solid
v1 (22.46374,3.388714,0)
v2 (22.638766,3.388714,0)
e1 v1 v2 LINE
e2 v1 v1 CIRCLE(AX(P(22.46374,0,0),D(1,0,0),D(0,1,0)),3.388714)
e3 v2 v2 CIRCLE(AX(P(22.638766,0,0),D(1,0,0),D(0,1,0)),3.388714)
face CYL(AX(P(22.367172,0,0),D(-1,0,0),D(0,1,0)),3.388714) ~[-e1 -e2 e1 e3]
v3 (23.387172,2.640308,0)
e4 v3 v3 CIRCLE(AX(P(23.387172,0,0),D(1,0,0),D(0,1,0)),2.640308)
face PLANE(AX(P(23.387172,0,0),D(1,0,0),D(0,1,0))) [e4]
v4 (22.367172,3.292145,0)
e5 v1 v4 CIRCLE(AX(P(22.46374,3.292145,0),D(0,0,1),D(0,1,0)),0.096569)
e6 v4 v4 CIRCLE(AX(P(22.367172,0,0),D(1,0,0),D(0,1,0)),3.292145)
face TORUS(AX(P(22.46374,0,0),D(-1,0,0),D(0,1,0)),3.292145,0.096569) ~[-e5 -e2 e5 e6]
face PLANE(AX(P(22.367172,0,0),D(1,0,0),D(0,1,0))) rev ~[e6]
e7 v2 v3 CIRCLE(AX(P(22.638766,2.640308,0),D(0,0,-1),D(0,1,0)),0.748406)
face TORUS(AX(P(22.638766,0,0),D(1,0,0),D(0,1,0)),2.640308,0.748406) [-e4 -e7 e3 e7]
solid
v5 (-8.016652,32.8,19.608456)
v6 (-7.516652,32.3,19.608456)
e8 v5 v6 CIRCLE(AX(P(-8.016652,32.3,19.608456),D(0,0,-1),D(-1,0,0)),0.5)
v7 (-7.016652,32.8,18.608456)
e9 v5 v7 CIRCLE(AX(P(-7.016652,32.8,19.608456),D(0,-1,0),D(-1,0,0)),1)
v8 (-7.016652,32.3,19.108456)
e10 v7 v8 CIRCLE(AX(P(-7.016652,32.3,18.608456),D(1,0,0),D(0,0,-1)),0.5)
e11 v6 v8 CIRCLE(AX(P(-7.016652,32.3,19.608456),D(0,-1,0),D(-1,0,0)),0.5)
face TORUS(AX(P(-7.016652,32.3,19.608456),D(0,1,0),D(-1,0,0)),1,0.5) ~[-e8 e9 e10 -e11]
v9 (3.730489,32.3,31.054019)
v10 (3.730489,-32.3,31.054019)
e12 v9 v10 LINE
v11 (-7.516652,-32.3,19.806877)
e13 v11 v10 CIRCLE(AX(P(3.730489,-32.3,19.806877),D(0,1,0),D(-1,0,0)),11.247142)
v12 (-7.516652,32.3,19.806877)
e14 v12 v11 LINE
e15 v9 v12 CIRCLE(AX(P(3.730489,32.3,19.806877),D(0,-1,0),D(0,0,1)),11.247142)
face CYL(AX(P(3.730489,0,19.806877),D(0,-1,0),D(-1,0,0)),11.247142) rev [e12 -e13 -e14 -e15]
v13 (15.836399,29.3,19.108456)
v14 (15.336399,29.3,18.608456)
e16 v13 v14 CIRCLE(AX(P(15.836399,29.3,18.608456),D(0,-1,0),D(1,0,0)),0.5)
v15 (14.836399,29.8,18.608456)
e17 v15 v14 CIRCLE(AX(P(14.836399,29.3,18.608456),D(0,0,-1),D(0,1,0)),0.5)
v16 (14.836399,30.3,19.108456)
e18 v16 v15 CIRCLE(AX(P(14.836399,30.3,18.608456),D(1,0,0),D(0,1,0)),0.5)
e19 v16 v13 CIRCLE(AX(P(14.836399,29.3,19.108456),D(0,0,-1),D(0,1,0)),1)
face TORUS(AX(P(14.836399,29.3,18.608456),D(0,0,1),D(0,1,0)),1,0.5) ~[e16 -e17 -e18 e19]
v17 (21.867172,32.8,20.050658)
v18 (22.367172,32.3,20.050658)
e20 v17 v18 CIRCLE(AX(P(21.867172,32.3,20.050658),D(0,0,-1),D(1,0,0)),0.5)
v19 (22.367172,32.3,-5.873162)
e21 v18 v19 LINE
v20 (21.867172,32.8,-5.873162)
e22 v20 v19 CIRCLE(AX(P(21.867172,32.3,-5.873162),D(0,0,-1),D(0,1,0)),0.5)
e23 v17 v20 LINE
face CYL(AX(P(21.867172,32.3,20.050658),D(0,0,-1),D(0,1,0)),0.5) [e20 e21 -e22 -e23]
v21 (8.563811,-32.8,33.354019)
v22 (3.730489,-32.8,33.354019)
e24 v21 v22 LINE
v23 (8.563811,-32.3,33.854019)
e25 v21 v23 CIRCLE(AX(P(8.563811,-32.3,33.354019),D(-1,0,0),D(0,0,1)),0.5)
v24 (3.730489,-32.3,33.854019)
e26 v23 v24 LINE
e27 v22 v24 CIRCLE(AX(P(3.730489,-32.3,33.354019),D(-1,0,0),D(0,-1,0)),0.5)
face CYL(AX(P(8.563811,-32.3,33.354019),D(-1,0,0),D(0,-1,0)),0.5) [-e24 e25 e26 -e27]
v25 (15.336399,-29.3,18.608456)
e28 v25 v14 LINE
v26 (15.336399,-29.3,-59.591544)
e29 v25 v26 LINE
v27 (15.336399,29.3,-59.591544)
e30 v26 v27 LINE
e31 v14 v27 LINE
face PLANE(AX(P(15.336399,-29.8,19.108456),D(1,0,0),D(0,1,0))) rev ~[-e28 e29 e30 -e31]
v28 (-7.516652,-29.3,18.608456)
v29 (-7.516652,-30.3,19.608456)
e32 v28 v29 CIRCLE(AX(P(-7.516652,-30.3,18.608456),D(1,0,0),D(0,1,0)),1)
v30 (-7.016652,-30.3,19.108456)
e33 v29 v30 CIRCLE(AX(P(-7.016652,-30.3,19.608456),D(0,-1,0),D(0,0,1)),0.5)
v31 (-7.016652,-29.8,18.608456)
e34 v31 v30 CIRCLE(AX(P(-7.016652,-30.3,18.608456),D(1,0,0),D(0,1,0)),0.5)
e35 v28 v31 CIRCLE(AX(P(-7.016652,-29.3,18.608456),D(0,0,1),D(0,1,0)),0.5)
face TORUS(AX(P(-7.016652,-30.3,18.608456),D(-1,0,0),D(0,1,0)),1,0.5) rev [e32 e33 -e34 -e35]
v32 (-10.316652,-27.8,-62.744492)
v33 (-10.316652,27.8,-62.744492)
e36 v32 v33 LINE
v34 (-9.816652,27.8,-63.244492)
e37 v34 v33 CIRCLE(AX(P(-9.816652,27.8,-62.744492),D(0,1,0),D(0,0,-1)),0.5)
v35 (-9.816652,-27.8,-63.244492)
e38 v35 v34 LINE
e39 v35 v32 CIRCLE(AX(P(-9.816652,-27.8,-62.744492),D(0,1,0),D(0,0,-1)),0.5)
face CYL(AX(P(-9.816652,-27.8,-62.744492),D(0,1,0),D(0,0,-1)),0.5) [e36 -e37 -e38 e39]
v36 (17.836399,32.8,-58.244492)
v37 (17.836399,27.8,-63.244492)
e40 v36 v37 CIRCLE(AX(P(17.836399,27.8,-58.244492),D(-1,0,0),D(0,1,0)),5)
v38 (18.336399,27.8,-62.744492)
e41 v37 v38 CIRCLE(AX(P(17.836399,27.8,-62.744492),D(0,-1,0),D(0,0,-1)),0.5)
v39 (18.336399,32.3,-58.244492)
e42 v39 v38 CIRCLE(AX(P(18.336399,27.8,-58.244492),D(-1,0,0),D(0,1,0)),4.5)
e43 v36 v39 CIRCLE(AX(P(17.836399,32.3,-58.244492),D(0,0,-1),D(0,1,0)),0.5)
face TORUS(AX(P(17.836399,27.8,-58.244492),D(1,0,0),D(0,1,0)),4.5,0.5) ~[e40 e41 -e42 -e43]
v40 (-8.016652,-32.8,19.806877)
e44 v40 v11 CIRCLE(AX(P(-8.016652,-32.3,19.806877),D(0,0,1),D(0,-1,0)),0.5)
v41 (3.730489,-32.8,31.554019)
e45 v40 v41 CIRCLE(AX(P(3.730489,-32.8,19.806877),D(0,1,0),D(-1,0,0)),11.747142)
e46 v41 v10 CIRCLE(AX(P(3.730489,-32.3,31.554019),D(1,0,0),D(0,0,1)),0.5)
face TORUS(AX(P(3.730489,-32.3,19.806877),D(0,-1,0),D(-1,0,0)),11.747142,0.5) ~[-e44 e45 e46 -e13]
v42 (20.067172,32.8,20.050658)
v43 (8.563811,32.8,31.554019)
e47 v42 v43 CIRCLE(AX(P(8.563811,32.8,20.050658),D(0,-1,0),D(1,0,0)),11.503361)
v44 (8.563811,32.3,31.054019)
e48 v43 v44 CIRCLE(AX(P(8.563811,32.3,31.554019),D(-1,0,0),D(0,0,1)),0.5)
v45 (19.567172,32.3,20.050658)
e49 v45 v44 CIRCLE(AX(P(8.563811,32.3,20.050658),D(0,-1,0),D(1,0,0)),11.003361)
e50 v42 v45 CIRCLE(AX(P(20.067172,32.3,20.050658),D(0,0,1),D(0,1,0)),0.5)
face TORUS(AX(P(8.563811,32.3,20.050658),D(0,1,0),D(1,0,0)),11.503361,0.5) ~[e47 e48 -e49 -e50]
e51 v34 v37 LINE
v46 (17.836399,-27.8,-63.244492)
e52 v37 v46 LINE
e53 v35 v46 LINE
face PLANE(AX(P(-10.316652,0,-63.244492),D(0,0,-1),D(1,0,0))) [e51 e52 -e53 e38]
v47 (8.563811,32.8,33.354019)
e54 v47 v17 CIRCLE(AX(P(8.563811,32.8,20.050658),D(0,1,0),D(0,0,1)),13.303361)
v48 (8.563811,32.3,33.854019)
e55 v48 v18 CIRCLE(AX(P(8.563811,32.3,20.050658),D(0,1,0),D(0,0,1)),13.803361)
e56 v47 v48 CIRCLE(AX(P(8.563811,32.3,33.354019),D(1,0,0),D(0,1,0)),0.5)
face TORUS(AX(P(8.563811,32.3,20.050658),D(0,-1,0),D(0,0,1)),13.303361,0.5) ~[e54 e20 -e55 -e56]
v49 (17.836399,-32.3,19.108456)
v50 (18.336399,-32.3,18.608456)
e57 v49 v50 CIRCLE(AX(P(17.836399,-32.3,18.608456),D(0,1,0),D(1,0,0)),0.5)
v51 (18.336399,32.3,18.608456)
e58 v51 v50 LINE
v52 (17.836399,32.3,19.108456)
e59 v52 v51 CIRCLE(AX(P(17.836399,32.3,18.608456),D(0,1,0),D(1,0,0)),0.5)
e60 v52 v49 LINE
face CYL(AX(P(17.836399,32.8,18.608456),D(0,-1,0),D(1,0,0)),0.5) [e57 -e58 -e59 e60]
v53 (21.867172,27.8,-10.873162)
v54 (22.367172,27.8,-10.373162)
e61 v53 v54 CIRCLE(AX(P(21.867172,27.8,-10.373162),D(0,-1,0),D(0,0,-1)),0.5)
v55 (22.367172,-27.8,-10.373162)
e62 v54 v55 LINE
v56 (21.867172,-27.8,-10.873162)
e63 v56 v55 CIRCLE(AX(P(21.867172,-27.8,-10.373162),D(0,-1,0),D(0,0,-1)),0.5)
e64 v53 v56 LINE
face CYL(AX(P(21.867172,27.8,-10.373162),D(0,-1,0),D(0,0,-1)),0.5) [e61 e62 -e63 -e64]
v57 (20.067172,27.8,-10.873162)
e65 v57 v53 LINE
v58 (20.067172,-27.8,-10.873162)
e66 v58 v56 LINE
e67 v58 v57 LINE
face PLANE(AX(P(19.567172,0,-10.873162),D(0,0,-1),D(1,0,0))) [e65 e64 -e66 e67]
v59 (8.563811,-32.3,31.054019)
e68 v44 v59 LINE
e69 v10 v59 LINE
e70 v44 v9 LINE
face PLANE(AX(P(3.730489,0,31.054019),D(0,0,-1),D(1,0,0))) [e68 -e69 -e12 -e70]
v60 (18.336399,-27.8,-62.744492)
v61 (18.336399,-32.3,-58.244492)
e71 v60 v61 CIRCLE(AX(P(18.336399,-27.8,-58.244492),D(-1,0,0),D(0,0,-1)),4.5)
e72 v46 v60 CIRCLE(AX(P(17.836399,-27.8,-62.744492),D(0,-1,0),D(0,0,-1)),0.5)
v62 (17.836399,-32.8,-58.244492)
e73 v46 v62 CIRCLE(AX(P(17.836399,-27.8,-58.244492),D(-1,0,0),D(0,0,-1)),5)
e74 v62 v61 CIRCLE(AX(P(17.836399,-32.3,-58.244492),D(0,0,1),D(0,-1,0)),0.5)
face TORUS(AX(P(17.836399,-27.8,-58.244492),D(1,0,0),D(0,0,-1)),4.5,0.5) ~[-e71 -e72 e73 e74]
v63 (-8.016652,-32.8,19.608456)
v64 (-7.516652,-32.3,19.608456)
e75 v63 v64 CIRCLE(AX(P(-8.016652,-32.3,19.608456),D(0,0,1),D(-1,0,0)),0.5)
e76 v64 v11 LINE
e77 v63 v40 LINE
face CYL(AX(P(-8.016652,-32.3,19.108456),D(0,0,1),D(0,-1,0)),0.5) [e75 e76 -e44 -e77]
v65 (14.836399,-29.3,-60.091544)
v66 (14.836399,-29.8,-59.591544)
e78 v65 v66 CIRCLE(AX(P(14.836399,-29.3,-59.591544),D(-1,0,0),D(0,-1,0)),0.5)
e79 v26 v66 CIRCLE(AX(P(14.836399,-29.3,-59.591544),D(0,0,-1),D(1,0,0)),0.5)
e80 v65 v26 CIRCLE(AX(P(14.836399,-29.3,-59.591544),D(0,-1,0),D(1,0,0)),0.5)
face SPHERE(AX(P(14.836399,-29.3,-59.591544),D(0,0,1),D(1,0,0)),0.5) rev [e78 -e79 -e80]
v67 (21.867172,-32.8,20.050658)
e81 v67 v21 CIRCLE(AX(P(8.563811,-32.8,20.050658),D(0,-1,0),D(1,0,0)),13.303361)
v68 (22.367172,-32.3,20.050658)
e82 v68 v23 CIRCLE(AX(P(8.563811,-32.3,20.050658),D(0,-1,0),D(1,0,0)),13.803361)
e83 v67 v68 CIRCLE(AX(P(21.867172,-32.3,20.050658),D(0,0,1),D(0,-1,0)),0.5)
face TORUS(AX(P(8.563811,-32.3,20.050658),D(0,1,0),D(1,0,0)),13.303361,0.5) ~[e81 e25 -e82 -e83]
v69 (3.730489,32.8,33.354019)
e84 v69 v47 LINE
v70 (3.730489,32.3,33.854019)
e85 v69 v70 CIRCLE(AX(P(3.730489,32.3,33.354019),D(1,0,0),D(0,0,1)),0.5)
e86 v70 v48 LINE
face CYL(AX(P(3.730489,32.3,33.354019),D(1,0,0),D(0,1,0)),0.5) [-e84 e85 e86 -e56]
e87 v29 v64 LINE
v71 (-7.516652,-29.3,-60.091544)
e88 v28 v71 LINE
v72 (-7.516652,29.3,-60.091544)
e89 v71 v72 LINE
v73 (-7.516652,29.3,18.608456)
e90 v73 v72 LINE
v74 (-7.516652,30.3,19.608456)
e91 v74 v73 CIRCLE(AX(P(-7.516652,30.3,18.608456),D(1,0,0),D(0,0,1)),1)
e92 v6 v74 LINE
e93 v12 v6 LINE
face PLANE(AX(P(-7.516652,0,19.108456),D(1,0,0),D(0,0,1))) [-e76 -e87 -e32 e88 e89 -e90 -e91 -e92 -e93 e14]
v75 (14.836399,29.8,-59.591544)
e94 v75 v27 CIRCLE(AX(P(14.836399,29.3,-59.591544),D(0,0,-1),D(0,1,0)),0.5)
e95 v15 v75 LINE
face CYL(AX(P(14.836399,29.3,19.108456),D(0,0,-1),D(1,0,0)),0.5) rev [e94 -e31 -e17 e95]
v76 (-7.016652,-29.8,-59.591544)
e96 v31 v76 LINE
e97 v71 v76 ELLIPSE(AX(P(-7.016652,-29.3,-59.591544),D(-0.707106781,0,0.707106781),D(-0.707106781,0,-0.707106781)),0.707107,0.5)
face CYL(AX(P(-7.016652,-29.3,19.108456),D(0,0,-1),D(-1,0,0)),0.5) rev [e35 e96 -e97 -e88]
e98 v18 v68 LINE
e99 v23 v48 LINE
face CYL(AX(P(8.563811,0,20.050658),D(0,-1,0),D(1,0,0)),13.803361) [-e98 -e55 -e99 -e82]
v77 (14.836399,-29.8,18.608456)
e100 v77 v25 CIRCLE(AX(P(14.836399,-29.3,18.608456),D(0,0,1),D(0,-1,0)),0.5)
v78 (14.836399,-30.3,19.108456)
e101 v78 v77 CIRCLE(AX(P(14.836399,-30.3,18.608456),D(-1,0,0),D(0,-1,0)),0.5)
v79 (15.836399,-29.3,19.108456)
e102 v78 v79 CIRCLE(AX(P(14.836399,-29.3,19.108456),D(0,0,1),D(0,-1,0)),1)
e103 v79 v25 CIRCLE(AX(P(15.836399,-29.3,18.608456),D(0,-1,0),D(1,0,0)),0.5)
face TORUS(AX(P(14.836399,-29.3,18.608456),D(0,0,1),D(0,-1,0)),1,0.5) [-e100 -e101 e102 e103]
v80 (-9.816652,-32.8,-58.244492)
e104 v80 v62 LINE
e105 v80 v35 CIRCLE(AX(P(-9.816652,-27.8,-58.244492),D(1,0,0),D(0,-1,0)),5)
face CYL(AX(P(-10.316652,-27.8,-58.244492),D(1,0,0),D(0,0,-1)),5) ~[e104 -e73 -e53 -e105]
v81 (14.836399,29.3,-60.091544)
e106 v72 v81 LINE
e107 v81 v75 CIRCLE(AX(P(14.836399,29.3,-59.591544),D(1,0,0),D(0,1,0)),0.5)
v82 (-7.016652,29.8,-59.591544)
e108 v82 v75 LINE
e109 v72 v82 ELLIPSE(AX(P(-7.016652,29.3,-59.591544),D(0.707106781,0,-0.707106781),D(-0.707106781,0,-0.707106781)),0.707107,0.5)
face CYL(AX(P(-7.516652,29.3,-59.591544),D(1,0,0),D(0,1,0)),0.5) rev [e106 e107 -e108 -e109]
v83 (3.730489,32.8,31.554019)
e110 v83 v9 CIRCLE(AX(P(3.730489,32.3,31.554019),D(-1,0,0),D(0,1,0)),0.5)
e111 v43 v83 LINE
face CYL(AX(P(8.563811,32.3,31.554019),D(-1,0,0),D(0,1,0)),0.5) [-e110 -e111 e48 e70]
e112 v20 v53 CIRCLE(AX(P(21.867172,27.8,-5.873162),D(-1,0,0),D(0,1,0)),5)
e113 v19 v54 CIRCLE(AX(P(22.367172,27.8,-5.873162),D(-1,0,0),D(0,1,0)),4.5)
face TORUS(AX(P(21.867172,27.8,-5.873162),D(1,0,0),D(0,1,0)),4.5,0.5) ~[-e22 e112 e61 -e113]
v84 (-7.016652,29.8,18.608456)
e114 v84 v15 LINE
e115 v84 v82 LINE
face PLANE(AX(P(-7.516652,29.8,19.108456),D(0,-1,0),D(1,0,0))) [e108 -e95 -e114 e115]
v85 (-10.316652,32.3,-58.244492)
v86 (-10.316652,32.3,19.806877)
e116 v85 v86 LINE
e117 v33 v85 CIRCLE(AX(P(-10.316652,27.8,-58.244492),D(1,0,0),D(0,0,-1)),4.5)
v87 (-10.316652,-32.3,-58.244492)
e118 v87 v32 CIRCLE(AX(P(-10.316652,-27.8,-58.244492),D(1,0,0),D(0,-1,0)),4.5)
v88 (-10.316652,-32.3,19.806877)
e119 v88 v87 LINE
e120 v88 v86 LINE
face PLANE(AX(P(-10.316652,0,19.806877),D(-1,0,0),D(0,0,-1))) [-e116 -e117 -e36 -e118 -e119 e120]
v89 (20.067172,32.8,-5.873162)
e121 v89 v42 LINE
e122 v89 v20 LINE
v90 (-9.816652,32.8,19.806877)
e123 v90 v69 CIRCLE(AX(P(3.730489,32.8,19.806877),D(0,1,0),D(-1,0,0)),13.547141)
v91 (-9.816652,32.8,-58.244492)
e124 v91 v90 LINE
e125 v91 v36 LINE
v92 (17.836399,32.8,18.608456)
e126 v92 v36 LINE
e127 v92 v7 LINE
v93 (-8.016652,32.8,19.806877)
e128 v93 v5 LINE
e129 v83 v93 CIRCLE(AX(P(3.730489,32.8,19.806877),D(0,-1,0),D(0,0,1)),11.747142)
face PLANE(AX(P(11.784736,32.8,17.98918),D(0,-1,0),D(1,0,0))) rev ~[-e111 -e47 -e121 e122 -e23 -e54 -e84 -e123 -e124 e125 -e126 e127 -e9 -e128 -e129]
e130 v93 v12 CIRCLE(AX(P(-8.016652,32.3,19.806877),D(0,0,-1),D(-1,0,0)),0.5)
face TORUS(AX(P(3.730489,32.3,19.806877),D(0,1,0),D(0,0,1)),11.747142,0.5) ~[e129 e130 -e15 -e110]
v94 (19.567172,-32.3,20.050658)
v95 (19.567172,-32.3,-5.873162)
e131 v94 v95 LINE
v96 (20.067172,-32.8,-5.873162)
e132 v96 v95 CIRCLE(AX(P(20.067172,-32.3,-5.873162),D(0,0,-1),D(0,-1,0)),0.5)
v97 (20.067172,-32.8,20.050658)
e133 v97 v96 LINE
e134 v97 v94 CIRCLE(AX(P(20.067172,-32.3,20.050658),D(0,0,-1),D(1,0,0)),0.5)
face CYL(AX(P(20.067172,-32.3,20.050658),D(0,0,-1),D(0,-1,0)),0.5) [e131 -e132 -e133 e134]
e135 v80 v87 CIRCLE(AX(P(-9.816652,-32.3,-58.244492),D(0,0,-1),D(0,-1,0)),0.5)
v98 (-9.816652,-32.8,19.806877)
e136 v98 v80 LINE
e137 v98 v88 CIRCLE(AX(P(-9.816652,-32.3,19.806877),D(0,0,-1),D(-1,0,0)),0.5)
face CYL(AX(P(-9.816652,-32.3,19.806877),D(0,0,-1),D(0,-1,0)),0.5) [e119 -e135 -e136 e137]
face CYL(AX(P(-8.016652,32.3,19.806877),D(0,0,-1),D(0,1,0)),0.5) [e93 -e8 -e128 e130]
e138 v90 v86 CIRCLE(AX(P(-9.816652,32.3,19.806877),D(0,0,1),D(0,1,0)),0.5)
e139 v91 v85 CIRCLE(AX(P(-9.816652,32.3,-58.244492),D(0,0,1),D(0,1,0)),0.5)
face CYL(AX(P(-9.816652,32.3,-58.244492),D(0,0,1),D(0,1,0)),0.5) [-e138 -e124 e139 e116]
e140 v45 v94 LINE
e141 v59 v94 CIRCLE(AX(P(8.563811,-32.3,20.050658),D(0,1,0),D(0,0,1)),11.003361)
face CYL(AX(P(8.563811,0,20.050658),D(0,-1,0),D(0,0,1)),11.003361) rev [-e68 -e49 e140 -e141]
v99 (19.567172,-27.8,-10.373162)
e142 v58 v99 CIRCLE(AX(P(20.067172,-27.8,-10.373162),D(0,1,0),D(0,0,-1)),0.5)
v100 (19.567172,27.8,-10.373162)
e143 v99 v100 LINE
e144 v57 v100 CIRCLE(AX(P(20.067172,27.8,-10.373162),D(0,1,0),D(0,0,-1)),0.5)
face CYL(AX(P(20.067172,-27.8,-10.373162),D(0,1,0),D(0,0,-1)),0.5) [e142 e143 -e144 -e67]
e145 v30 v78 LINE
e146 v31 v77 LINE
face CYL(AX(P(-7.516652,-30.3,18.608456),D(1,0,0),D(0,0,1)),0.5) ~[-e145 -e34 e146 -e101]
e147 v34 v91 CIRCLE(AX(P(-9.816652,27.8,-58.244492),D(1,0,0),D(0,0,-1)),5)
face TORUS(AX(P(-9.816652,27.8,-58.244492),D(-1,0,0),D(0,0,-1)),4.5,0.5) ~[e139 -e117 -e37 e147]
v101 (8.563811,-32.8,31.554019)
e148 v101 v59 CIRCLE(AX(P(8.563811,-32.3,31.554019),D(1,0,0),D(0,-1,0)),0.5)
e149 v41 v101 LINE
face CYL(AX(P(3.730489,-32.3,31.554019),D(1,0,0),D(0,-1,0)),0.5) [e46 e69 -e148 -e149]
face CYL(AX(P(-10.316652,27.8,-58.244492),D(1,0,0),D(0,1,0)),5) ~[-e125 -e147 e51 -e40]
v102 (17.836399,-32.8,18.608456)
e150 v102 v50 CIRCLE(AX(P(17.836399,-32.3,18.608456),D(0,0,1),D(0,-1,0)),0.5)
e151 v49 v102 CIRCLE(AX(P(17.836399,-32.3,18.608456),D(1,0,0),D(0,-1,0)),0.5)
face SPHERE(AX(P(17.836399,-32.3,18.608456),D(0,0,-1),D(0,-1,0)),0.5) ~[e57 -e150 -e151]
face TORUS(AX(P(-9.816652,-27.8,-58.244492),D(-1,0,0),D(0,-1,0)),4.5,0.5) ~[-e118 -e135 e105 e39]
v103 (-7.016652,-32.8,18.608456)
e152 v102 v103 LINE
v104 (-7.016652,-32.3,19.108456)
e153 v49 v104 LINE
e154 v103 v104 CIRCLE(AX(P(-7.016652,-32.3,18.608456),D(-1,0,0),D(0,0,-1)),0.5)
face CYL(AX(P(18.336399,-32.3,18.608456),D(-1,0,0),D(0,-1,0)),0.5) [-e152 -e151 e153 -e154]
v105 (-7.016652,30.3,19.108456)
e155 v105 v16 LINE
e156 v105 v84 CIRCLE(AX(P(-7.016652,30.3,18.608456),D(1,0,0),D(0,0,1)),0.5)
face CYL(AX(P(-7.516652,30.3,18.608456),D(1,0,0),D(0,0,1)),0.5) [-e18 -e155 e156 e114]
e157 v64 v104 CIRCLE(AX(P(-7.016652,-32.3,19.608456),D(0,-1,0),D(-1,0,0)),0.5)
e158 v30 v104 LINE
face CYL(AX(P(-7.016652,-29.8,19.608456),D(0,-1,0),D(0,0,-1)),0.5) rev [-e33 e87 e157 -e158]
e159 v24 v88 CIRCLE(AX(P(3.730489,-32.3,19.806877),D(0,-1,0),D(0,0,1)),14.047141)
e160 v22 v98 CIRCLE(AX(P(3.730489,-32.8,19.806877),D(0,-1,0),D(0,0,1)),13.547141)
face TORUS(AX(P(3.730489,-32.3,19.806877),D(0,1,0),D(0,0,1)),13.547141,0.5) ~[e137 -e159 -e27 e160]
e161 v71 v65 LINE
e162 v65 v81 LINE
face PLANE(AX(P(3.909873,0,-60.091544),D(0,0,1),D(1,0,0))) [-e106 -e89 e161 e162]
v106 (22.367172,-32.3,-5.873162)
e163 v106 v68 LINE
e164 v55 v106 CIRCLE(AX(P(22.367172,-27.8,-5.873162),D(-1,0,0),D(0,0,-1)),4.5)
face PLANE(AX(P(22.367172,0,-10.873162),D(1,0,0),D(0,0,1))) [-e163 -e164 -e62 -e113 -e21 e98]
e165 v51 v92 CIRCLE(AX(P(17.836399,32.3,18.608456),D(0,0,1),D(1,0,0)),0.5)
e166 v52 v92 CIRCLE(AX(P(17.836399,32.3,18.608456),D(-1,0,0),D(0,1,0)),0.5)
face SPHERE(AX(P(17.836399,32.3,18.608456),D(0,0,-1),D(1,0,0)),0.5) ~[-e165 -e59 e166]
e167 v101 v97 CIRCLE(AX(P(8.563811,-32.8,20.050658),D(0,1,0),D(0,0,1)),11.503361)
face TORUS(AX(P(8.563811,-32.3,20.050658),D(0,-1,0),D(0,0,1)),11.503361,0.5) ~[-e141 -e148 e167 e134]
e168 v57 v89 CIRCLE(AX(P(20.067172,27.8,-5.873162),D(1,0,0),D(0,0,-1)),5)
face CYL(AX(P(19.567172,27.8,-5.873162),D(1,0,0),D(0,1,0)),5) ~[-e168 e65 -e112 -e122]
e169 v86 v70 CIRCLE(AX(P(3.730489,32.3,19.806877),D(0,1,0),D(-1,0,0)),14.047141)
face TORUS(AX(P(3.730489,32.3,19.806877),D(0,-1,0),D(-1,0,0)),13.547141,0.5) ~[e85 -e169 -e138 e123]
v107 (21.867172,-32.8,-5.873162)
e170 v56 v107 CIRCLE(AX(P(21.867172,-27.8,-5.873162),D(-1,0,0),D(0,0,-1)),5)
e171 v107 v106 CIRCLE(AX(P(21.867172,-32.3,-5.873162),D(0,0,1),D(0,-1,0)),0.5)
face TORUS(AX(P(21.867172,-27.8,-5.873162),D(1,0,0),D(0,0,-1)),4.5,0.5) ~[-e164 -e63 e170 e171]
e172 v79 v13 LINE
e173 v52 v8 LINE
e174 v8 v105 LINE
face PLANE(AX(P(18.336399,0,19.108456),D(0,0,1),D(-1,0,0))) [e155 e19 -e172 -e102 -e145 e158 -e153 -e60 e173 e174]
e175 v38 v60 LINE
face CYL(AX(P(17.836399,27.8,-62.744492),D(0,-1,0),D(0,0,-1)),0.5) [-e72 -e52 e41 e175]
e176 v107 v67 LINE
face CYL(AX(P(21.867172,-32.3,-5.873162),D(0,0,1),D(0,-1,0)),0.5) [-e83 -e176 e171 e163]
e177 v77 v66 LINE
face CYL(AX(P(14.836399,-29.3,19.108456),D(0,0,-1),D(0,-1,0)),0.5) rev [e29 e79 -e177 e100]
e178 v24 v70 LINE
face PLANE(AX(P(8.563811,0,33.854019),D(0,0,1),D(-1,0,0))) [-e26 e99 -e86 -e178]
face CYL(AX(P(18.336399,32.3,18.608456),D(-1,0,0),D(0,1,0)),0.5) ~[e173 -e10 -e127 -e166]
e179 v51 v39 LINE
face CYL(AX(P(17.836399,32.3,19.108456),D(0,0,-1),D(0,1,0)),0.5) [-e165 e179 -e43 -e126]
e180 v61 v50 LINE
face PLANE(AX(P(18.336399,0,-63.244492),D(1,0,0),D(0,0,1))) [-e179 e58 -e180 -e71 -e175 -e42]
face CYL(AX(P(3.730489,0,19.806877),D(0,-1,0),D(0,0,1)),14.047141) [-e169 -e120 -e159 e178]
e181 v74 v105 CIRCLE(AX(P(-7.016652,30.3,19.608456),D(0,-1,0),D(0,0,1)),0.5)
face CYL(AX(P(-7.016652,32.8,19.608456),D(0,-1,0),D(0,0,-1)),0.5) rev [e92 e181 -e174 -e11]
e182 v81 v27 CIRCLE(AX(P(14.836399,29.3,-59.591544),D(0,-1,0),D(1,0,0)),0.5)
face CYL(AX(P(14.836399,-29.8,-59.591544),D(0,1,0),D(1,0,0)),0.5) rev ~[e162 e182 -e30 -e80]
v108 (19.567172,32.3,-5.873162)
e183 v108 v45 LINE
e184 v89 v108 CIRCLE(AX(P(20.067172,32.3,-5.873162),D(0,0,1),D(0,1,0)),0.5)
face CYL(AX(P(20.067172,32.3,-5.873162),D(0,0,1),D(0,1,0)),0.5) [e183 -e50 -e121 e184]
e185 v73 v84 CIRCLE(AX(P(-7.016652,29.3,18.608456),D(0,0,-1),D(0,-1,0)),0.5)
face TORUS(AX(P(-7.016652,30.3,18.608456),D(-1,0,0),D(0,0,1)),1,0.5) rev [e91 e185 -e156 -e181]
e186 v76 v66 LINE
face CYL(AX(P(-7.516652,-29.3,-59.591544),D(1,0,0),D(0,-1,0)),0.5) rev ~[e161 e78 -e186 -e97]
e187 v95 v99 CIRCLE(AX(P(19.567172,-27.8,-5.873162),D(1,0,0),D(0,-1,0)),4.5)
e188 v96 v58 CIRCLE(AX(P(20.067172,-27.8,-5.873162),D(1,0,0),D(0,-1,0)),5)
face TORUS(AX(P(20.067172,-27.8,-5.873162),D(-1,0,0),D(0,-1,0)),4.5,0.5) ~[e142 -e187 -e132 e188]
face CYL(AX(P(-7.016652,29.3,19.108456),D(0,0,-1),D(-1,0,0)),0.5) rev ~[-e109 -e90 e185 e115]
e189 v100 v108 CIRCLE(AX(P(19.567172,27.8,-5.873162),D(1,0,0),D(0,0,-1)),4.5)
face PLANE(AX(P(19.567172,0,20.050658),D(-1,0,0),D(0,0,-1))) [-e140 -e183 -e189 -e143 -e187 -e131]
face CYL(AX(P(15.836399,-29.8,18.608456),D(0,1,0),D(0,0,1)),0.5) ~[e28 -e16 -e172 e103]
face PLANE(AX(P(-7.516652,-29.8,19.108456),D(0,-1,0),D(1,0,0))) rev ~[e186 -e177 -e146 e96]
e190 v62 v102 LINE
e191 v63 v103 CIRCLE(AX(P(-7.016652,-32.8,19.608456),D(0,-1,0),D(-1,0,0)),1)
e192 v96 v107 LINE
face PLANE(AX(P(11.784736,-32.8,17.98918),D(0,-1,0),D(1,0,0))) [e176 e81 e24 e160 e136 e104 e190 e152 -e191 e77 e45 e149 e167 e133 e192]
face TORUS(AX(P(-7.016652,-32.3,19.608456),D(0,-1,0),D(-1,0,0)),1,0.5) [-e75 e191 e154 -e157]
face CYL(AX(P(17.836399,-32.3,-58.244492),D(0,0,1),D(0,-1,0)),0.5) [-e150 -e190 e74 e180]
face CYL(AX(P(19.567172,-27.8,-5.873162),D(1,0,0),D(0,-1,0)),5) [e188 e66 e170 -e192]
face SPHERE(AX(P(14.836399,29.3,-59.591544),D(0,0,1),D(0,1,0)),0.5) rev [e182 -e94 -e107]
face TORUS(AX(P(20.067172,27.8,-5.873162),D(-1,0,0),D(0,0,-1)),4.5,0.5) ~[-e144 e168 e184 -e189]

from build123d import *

# Parameters (mm, degrees)
F1_DEPTH = 32.8
F2_W     = 22.8530508727
F2_H     = 59.6
F3_DEPTH = 79.2
F4_R     = 5
F5_R     = 0.5
F6_R     = 3.3887140156
F7_DEPTH = 1.02
F8_R     = 0.7484062043
F9_R     = 0.0965685425


with BuildPart() as f1:
    # F0 (on Front) → F1 (new body, symmetric)
    with BuildSketch(Plane.XZ):
        with BuildLine():
            Line((-10.3166522458, 19.8068774239), (-10.3166522458, 19.1084556282))
            Line((-10.3166522458, 19.1084556282), (-7.5166523457, 19.1084556282))
            Line((-7.5166523457, 19.1084556282), (-7.5166523457, 19.8068774239))
            ThreePointArc((-7.5166523457, 19.8068774239), (-4.222440848, 27.759807499), (3.7304892271, 31.0540189967))
            Line((3.7304892271, 31.0540189967), (8.563811205, 31.0540189967))
            ThreePointArc((8.563811205, 31.0540189967), (16.3443622694, 27.831209223), (19.567172043, 20.0506581586))
            Line((19.567172043, 20.0506581586), (19.567172043, -10.8731621876))
            Line((19.567172043, -10.8731621876), (22.3671719432, -10.8731621876))
            Line((22.3671719432, -10.8731621876), (22.3671719432, 20.0506581586))
            ThreePointArc((22.3671719432, 20.0506581586), (18.3242611861, 29.8111081398), (8.563811205, 33.8540188968))
            Line((8.563811205, 33.8540188968), (3.7304892271, 33.8540188968))
            ThreePointArc((3.7304892271, 33.8540188968), (-6.2023397647, 29.7397064157), (-10.3166522458, 19.8068774239))
        make_face()
        Polygon((-7.5166523457, 19.1084556282), (-10.3166522458, 19.1084556282), (-10.3166522458, -63.2444918156), (18.336398527, -63.2444918156), (18.336398527, 19.1084556282), align=None)
    extrude(amount=F1_DEPTH, both=True)

    # F2 (on face) → F3 (cut)
    with BuildSketch(Plane.XY.offset(19.1084556282)):
        with Locations((3.9098730907, 0)):
            Rectangle(F2_W, F2_H)
    extrude(amount=-F3_DEPTH, mode=Mode.SUBTRACT)

    # F4
    f4_edges = [f1.edges().sort_by_distance(p)[0] for p in [
        (20.967172, -32.8, -10.873162),
        (20.967172, 32.8, -10.873162),
        (4.009873, 32.8, -63.244492),
        (4.009873, -32.8, -63.244492),
    ]]
    fillet(f4_edges, radius=F4_R)

    # F5
    f5_edges = [f1.edges().sort_by_distance(p)[0] for p in [
        (22.367172, -32.8, 7.088748),
        (6.14715, -32.8, 31.054019),
        (18.336399, -32.8, -19.568018),
        (5.409873, -32.8, 19.108456),
        (18.336399, 0, 19.108456),
        (3.909873, -29.8, 19.108456),
        (15.336399, 0, 19.108456),
        (15.336399, 29.8, -20.491544),
        (-7.516652, 29.8, -20.491544),
        (3.909873, 29.8, 19.108456),
        (3.909873, 29.8, -60.091544),
        (15.336399, -29.8, -20.491544),
        (15.336399, 0, -60.091544),
        (-7.516652, -29.8, -20.491544),
        (3.909873, -29.8, -60.091544),
        (-10.316652, 32.8, -19.218807),
        (-6.20234, 32.8, 29.739706),
        (18.336399, 32.8, -19.568018),
        (6.14715, 32.8, 33.854019),
        (5.409873, 32.8, 19.108456),
        (18.324261, 32.8, 29.811108),
        (22.367172, 32.8, 7.088748),
        (-4.222441, 32.8, 27.759807),
        (6.14715, 32.8, 31.054019),
        (19.567172, 32.8, 7.088748),
        (16.344362, 32.8, 27.831209),
        (-10.316652, 31.335534, -61.780026),
        (-10.316652, 0, -63.244492),
        (-10.316652, -32.8, -19.218807),
        (-10.316652, -31.335534, -61.780026),
        (18.336399, 31.335534, -61.780026),
        (-6.20234, -32.8, 29.739706),
        (18.336399, 0, -63.244492),
        (18.336399, -31.335534, -61.780026),
        (6.14715, -32.8, 33.854019),
        (-7.516652, -31.3, 19.108456),
        (-7.516652, 31.3, 19.108456),
        (18.324261, -32.8, 29.811108),
        (22.367172, 31.335534, -9.408696),
        (22.367172, 0, -10.873162),
        (22.367172, -31.335534, -9.408696),
        (-4.222441, -32.8, 27.759807),
        (19.567172, 31.335534, -9.408696),
        (19.567172, 0, -10.873162),
        (19.567172, -32.8, 7.088748),
        (19.567172, -31.335534, -9.408696),
        (16.344362, -32.8, 27.831209),
    ]]
    fillet(f5_edges, radius=F5_R)


with BuildPart() as f7:
    # F6 (on face) → F7 (new body)
    with BuildSketch(Plane.YZ.offset(22.3671719432)):
        Circle(F6_R)
    extrude(amount=F7_DEPTH)

    # F8
    f8_edges = [f7.edges().sort_by_distance(p)[0] for p in [
        (23.387172, -3.388714, 0),
    ]]
    fillet(f8_edges, radius=F8_R)

    # F9
    f9_edges = [f7.edges().sort_by_distance(p)[0] for p in [
        (22.367172, -3.388714, 0),
    ]]
    fillet(f9_edges, radius=F9_R)


solid = Compound([f1.part, f7.part])
